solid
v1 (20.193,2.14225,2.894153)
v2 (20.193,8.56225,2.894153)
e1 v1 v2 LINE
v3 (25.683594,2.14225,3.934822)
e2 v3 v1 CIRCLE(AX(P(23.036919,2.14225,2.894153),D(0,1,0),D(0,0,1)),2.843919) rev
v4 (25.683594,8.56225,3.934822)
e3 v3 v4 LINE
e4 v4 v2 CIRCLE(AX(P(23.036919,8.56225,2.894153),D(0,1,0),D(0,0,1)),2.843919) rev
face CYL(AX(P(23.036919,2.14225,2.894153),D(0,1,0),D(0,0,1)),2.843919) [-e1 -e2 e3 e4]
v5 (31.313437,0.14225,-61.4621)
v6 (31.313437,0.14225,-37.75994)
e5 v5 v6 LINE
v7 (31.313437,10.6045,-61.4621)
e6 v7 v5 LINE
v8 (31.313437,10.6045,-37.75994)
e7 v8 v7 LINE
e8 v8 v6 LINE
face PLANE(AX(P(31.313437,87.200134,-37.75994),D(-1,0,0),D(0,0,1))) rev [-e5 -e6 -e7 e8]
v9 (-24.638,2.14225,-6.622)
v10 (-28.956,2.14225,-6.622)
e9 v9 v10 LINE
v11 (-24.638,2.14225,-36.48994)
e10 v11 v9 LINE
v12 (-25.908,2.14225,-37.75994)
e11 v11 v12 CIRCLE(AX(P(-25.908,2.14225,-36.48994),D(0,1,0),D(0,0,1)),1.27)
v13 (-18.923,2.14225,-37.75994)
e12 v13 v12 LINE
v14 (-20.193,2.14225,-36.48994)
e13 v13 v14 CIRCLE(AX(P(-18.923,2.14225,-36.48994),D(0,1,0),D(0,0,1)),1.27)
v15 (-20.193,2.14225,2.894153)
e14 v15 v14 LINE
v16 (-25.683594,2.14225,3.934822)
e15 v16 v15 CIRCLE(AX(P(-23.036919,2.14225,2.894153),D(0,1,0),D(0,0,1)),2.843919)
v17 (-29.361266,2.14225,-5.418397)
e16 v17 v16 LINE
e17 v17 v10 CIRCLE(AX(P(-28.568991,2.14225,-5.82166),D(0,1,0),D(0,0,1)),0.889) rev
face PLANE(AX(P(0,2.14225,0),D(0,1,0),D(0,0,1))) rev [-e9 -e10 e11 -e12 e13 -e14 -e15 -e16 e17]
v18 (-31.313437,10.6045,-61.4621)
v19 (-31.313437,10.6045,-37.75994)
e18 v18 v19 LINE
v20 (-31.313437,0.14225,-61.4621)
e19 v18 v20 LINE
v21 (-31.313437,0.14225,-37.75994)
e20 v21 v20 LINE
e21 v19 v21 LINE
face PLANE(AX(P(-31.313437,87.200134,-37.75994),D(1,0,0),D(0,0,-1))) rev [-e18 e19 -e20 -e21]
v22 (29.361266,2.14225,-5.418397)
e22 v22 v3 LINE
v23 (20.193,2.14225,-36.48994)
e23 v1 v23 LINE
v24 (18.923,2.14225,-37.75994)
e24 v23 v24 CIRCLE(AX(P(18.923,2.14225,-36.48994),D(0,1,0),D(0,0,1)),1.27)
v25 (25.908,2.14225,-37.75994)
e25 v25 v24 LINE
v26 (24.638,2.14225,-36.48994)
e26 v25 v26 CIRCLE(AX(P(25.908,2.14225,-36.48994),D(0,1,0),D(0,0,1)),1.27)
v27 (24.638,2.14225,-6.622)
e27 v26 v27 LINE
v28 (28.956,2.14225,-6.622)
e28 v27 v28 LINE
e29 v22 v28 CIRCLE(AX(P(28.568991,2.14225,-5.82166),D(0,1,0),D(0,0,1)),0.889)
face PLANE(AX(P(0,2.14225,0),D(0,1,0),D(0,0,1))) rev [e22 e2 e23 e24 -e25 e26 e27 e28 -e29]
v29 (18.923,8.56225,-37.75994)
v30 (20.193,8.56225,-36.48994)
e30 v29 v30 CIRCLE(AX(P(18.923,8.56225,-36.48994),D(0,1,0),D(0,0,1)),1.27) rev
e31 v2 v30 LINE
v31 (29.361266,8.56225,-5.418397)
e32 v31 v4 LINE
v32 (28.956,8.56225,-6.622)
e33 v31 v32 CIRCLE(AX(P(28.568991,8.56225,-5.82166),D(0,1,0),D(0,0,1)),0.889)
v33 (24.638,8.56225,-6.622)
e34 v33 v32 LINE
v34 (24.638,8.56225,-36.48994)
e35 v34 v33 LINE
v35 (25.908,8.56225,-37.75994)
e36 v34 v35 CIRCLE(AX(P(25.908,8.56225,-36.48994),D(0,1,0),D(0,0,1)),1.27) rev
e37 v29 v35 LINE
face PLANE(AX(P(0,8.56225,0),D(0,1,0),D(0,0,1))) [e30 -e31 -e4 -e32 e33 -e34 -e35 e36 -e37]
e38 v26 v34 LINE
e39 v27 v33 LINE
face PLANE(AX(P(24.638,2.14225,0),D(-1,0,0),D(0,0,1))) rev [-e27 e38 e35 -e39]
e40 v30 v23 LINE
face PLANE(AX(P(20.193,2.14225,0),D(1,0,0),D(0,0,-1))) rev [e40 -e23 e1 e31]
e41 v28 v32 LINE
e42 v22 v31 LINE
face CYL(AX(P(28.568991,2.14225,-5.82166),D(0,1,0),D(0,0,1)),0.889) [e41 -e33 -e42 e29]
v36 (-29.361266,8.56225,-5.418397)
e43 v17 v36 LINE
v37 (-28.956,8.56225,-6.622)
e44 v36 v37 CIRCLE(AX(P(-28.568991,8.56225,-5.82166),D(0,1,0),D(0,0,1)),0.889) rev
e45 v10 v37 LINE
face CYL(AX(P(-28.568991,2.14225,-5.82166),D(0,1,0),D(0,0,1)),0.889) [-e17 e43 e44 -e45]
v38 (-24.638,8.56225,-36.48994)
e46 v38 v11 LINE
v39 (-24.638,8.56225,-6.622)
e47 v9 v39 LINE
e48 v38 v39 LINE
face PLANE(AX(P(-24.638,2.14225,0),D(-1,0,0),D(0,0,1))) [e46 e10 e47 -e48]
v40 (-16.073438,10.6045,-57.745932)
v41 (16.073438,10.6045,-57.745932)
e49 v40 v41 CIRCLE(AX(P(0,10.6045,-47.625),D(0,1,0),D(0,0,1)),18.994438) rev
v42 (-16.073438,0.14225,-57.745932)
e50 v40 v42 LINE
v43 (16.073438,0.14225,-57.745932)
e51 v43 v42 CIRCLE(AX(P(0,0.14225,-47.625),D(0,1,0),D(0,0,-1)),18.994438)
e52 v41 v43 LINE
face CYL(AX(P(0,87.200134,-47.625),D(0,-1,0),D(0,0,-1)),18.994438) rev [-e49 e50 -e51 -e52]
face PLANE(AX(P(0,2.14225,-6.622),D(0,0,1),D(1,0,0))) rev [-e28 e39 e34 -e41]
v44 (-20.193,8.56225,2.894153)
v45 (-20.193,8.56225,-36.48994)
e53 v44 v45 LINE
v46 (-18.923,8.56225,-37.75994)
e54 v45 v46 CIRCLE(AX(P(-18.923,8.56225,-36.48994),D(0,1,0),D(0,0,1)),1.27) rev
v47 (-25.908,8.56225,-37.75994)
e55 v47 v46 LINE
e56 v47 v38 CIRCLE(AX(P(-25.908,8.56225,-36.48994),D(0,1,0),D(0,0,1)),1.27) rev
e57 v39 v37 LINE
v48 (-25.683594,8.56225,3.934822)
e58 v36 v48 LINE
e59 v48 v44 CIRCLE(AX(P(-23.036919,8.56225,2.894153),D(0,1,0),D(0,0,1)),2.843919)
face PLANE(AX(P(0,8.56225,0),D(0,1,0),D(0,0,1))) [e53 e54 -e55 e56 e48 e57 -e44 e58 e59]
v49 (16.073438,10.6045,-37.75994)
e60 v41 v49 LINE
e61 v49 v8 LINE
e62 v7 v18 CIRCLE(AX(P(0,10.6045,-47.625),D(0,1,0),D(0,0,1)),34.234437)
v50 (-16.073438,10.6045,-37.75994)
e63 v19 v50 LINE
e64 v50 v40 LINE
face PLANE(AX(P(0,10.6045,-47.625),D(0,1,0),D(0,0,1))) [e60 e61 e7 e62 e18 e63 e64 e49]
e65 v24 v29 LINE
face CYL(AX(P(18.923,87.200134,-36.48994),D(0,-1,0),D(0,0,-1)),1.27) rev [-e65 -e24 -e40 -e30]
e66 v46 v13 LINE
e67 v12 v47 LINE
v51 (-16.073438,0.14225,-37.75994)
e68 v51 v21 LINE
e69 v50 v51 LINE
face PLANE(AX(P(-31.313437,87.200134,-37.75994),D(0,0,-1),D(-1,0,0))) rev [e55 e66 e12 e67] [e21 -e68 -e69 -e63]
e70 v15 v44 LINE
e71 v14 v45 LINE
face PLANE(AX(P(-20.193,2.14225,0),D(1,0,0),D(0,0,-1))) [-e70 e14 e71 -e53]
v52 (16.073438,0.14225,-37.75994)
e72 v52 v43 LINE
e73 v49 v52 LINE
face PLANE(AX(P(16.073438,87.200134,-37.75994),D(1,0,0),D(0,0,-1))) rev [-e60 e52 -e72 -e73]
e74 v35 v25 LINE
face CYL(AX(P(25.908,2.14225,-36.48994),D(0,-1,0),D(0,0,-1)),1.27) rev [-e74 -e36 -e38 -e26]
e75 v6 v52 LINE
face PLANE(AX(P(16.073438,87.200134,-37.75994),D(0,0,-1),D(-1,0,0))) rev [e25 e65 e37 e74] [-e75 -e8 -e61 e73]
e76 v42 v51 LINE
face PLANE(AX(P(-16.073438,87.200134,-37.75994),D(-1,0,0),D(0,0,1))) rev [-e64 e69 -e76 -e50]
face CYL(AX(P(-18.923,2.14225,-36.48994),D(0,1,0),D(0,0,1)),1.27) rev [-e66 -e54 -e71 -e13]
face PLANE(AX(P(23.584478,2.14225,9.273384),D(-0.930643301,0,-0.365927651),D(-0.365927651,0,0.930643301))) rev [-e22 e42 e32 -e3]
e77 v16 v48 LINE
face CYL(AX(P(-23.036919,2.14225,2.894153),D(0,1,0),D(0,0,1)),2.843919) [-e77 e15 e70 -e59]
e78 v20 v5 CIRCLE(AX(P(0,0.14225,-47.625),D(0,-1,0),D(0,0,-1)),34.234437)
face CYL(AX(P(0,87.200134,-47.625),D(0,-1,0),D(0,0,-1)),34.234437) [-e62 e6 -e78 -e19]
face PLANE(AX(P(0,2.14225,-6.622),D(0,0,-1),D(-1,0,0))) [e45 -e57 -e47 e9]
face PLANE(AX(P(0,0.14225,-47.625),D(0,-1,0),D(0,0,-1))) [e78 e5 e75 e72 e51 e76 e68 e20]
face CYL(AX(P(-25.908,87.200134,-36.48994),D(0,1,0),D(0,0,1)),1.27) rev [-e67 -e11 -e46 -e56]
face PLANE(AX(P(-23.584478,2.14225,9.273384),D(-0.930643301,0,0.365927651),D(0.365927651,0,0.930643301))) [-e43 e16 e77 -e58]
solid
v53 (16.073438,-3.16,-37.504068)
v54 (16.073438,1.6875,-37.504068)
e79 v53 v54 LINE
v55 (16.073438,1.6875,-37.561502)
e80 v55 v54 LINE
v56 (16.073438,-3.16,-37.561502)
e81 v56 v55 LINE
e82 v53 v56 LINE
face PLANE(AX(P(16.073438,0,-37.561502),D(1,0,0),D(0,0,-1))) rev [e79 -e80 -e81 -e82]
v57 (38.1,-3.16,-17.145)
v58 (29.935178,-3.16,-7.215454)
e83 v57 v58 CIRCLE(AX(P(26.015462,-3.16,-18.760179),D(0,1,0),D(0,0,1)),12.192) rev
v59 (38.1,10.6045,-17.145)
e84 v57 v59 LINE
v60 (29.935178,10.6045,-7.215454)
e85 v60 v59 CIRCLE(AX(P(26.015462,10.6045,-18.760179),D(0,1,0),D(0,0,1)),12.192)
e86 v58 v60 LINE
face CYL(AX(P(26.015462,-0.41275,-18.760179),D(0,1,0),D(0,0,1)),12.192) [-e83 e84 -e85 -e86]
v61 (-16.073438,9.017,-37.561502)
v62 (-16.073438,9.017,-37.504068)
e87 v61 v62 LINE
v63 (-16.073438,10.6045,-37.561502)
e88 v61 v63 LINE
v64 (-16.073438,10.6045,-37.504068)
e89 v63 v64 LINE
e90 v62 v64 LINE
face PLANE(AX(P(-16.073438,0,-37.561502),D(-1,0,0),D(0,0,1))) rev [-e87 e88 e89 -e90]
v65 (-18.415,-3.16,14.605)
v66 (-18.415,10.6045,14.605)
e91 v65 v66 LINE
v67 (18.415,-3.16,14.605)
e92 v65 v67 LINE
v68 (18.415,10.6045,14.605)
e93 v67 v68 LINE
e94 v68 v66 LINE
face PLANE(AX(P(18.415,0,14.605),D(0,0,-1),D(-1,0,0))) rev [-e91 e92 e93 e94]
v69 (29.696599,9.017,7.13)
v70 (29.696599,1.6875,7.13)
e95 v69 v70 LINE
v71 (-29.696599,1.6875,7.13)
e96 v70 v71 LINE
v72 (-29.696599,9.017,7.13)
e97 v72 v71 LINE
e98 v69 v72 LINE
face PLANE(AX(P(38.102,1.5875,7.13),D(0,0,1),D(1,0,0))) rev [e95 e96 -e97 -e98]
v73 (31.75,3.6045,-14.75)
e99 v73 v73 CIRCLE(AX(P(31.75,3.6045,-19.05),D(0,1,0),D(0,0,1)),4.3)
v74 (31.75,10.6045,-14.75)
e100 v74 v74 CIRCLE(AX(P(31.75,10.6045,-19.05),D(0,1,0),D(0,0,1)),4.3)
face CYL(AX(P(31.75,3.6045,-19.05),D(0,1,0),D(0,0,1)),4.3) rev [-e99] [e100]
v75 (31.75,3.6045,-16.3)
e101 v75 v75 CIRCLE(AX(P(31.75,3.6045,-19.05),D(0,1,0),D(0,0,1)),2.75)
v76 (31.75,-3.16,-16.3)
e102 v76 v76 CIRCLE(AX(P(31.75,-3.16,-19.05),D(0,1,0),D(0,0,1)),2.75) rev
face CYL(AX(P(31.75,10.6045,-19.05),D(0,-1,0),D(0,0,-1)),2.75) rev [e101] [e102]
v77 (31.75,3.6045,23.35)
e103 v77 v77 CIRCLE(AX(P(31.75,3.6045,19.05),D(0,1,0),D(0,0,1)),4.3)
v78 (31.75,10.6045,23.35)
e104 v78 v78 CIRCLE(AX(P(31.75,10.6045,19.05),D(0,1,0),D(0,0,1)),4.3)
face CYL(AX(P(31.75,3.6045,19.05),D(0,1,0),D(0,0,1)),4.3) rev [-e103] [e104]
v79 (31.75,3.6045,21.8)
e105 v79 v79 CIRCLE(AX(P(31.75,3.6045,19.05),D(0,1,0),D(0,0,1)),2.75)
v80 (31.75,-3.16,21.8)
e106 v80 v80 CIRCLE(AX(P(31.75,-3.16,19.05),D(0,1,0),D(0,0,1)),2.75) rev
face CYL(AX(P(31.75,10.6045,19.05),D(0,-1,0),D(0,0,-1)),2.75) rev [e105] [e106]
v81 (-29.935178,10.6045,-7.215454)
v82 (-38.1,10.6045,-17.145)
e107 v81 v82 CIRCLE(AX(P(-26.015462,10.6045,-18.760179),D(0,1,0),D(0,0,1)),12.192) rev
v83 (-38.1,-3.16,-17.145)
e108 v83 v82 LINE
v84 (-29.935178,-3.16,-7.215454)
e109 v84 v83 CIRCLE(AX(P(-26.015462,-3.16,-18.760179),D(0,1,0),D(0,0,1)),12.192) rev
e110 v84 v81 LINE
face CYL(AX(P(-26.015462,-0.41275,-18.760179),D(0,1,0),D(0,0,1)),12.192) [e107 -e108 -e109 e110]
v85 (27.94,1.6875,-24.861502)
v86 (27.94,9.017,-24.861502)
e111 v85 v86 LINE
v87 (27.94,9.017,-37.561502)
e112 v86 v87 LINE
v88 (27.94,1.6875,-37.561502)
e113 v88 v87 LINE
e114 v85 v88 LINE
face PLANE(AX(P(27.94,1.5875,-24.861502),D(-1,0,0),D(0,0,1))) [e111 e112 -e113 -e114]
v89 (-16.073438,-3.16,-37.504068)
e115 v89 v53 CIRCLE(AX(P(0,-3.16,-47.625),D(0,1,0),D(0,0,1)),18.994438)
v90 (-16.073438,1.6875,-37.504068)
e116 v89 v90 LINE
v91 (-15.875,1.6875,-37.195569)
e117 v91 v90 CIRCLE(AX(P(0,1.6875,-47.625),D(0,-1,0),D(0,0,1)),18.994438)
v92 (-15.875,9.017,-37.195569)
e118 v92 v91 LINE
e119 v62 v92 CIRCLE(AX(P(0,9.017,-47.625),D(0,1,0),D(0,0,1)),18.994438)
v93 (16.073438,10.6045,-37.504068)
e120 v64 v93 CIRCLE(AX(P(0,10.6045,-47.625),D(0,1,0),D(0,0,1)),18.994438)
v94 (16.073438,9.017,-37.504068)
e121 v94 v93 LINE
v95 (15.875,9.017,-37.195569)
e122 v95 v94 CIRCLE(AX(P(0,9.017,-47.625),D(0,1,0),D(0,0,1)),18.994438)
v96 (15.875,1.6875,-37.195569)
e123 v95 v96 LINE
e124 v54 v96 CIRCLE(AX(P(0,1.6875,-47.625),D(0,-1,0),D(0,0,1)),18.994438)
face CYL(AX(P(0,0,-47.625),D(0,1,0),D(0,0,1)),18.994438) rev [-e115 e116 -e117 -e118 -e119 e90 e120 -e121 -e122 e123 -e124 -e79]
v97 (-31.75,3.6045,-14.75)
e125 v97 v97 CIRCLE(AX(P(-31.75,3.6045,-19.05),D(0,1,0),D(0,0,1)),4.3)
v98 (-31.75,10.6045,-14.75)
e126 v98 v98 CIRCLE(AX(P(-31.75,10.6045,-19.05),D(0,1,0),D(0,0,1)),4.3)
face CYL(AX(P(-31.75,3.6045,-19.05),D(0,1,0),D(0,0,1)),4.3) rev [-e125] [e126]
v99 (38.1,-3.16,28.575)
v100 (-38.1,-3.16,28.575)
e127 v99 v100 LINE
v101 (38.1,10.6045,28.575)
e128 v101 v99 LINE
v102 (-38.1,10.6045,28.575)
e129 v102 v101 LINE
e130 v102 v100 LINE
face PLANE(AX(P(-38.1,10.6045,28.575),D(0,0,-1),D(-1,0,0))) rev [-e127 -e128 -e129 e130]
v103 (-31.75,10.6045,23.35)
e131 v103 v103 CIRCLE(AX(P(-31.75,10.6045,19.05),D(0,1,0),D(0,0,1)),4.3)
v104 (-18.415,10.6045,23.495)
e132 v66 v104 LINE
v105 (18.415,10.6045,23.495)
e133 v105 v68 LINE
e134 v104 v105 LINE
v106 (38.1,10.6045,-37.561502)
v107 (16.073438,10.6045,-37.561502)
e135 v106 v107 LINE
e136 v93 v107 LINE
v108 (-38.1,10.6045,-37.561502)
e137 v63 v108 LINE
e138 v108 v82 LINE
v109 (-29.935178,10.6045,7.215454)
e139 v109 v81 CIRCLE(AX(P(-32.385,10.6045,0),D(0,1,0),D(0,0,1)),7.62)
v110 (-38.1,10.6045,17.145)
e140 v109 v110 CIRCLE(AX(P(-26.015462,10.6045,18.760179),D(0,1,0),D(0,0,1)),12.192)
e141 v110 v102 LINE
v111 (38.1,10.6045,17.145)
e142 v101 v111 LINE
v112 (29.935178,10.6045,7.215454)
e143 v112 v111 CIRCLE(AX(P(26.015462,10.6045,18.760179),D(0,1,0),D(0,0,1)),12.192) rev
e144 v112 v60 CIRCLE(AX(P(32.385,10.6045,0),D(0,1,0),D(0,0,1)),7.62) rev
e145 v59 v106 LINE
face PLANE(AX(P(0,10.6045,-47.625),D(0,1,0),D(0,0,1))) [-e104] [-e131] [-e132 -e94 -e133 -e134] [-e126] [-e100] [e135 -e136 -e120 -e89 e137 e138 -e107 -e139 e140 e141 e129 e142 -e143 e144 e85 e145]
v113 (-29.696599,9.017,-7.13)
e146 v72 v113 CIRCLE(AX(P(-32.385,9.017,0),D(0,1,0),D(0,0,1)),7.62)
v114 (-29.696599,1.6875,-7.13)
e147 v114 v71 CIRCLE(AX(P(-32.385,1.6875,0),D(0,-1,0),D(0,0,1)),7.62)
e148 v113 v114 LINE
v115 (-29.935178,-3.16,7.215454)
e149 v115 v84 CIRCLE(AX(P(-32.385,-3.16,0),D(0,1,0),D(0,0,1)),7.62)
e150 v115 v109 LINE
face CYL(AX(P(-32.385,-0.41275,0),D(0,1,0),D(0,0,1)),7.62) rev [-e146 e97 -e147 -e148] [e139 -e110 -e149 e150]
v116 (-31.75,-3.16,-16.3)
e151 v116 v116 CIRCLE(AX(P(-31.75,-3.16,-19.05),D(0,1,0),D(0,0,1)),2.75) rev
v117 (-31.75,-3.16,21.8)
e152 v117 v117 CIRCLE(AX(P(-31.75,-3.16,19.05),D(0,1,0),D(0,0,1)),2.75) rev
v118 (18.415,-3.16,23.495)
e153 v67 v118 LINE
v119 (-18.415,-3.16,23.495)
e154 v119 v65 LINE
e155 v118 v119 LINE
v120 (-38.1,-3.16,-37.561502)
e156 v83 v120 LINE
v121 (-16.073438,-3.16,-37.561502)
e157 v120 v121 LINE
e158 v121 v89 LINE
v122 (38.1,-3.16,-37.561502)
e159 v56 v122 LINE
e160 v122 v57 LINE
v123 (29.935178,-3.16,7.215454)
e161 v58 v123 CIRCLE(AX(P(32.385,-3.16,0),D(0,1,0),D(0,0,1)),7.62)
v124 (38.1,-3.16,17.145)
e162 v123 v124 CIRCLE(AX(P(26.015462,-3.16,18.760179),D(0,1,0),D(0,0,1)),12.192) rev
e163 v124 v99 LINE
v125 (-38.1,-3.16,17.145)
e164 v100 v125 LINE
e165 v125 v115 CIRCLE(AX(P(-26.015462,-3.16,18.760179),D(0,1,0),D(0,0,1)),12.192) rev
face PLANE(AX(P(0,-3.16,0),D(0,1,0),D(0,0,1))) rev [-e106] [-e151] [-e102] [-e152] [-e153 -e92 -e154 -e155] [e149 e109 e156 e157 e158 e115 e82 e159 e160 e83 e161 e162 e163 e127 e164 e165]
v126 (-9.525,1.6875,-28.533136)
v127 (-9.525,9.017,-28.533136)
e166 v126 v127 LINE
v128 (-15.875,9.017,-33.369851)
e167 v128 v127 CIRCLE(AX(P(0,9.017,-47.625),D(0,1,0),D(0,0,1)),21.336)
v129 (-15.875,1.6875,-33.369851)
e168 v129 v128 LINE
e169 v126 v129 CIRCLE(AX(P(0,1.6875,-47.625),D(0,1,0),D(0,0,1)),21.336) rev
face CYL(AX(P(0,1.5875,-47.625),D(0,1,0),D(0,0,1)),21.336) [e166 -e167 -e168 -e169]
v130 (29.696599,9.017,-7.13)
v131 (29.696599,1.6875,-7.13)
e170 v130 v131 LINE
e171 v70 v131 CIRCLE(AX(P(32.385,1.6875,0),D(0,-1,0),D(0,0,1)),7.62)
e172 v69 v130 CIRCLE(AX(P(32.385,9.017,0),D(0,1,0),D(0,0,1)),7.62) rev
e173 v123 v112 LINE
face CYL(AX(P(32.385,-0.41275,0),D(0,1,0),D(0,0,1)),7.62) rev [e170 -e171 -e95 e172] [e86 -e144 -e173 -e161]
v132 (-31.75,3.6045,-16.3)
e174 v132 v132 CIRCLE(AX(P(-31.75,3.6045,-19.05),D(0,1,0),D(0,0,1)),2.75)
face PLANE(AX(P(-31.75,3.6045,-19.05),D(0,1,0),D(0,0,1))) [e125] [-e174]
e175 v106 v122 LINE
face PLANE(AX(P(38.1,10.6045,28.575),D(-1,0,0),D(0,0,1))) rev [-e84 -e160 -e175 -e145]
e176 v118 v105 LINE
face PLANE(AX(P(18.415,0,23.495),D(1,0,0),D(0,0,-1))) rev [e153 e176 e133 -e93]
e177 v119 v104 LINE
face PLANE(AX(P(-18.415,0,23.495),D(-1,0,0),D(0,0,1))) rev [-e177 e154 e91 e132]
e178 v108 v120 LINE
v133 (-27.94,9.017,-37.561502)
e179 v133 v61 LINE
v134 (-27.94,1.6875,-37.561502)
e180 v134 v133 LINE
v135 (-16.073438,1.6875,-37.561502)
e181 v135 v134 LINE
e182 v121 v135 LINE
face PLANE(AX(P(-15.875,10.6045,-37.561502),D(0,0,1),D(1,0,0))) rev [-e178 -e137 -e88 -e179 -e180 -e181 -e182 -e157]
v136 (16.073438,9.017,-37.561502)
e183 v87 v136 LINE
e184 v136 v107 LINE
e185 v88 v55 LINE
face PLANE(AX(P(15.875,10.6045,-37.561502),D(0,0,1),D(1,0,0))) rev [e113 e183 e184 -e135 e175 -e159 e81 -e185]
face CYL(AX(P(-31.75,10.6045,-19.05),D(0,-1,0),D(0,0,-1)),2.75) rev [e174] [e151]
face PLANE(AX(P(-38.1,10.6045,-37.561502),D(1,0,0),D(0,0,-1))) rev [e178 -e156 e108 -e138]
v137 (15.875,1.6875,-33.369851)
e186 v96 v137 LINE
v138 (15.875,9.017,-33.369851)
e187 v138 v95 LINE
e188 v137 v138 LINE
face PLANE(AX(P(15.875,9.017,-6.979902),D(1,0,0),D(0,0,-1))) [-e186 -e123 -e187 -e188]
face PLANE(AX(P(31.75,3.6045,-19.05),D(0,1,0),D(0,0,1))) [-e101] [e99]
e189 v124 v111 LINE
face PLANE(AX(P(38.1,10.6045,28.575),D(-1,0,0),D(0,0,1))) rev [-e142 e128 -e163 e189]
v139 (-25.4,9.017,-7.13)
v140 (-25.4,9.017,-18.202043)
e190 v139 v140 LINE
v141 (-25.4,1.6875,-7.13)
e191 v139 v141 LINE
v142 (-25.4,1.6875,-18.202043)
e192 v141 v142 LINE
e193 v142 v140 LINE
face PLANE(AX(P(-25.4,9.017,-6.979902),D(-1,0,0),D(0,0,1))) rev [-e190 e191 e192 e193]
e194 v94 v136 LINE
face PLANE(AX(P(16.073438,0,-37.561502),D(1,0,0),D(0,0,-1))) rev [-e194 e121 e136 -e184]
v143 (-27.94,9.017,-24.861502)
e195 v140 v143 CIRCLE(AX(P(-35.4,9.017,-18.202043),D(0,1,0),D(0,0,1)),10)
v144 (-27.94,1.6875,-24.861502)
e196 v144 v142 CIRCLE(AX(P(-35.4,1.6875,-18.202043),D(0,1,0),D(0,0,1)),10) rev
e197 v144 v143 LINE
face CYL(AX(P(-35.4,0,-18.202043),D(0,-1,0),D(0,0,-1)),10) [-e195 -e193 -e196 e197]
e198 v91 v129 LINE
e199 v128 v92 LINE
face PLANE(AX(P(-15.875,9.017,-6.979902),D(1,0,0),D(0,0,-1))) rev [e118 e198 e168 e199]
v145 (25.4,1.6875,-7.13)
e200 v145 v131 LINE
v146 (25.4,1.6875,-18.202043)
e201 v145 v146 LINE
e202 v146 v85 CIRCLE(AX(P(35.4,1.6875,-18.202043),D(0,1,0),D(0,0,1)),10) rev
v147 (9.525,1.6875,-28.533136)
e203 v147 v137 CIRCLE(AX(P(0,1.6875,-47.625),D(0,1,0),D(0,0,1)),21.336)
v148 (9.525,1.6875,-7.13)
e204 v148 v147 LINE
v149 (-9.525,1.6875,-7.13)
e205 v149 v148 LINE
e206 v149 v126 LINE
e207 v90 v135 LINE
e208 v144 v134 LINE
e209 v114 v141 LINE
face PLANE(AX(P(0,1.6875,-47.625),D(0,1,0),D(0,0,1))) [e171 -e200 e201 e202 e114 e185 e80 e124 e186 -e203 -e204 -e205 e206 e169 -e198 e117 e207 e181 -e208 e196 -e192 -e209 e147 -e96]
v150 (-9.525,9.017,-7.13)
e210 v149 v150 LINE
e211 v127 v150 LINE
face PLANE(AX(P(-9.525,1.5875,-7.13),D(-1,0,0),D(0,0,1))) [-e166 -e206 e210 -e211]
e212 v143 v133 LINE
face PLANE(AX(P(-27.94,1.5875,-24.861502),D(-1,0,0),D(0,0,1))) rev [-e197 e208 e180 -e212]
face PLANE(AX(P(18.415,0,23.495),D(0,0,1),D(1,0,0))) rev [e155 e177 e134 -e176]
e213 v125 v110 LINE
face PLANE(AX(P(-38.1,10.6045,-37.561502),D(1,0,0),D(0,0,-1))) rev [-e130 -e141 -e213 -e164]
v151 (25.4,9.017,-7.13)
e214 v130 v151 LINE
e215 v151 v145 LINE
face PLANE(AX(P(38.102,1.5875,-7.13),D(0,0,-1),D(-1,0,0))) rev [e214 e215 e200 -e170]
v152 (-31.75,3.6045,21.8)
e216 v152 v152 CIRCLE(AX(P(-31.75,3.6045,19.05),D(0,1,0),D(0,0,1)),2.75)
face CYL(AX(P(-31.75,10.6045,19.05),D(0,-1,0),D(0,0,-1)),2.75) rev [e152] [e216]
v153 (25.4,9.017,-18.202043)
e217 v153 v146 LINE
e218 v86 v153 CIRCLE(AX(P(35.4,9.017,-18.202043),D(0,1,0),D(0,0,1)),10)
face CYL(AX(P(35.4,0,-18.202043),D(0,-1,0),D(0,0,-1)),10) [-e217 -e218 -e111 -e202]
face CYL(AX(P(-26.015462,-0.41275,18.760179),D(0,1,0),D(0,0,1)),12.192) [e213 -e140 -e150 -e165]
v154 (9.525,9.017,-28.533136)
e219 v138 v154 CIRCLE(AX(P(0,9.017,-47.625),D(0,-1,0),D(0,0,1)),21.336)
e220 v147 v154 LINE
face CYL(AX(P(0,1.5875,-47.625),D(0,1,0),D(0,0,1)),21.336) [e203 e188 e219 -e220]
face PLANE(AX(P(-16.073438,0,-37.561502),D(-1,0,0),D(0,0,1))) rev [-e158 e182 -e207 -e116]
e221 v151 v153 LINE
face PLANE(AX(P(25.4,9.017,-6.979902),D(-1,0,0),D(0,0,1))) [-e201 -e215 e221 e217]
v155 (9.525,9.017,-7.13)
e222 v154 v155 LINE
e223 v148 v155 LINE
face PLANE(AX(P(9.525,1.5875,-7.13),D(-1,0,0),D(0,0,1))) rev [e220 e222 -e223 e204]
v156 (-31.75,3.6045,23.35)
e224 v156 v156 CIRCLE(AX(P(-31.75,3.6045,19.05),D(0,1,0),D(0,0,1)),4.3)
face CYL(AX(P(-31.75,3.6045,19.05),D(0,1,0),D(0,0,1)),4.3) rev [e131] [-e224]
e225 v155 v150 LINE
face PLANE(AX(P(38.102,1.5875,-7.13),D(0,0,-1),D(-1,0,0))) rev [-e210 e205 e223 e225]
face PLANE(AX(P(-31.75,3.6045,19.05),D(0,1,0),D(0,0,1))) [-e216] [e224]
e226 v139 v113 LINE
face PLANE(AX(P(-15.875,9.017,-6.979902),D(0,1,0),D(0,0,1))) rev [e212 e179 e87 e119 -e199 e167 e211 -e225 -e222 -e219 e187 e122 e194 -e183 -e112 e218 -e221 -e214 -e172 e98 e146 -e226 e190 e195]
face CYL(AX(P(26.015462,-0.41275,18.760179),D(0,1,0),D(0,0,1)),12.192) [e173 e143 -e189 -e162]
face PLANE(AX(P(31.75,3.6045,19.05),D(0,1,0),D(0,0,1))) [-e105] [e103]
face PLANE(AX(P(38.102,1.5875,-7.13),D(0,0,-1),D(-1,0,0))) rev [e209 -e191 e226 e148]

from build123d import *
from build123d.topology import SkipClean

# Parameters (mm, degrees)
SKETCH1_R                = 2.75
BOSS_EXTRUDE1_DEPTH      = 10.6045
SKETCH2_R                = 4.3
CUT_EXTRUDE1_DEPTH       = 7
SKETCH3_W                = 9.525
SKETCH3_H                = 7.4295
CUT_EXTRUDE2_DEPTH       = 30.5816
CUT_EXTRUDE5_REACH       = 87.614
SKETCH4_W                = 14.26
SKETCH4_H                = 7.4295
CUT_EXTRUDE6_DEPTH       = 3.71475
CUT_EXTRUDE7_DEPTH       = 5.715
MIRROR5_COPY_1_DEPTH     = 5.715
BOSS_EXTRUDE3_DEPTH      = 3.26
BOSS_EXTRUDE3_DEPTH_BACK = 3.16
CUT_EXTRUDE8_DEPTH       = 91.912226505
BOSS_EXTRUDE4_START      = 2.04225
BOSS_EXTRUDE4_DEPTH      = 2.04225
SKETCH13_W               = 36.83
SKETCH13_H               = 8.89
CUT_EXTRUDE10_DEPTH      = 91.912226505
SKETCH16_W               = 2.54
SKETCH16_H               = 7.4295
CUT_EXTRUDE11_DEPTH      = 12.7
FILLET1_R                = 10
FILLET3_R                = 1.27
BOSS_EXTRUDE5_DEPTH      = 0.1
BOSS_EXTRUDE5_DEPTH_BACK = 4.7475
SKETCH20_R               = 2.75
SKETCH20_W               = 36.83
SKETCH20_H               = 8.89
BOSS_EXTRUDE6_START      = 2
BOSS_EXTRUDE6_DEPTH      = 2


with BuildPart() as part:
    # Sketch1 → Boss-Extrude1 (new body)
    with BuildSketch(Plane(origin=(0, 0, 0), x_dir=(1, 0, 0), z_dir=(0, 1, 0))):
        with BuildLine():
            Line((-38.1, -28.575), (38.1, -28.575))
            Line((38.1, -28.575), (38.1, 37.561502049))
            Line((38.1, 37.561502049), (15.875, 37.561502049))
            ThreePointArc((15.875, 37.561502049), (0, 28.829), (-15.875, 37.561502049))
            Line((-15.875, 37.561502049), (-38.1, 37.561502049))
            Line((-38.1, 37.561502049), (-38.1, -28.575))
        make_face()
        with Locations(Location((-31.75, 19.05, 0), (0, 0, 270))):
            Circle(SKETCH1_R, mode=Mode.SUBTRACT)
        with Locations(Location((31.75, 19.05, 0), (0, 0, 270))):
            Circle(SKETCH1_R, mode=Mode.SUBTRACT)
        with Locations(Location((31.75, -19.05, 0), (0, 0, 270))):
            Circle(SKETCH1_R, mode=Mode.SUBTRACT)
        with Locations(Location((-31.75, -19.05, 0), (0, 0, 270))):
            Circle(SKETCH1_R, mode=Mode.SUBTRACT)
    extrude(amount=BOSS_EXTRUDE1_DEPTH)

    # Sketch2 → Cut-Extrude1 (cut)
    with BuildSketch(Plane(origin=(0, 10.6045, 0), x_dir=(1, 0, 0), z_dir=(0, 1, 0))):
        with Locations(Location((-31.75, 19.05, 0), (0, 0, 270))):
            Circle(SKETCH2_R)
        with Locations(Location((31.75, 19.05, 0), (0, 0, 270))):
            Circle(SKETCH2_R)
        with Locations(Location((31.75, -19.05, 0), (0, 0, 270))):
            Circle(SKETCH2_R)
        with Locations(Location((-31.75, -19.05, 0), (0, 0, 270))):
            Circle(SKETCH2_R)
    extrude(amount=-CUT_EXTRUDE1_DEPTH, mode=Mode.SUBTRACT)

    # Sketch3 → Cut-Extrude2 (cut)
    with BuildSketch(Plane(origin=(0, 0, -37.561502049), x_dir=(-1, 0, 0), z_dir=(0, 0, -1))):
        with Locations((20.6375, 5.30225)):
            Rectangle(SKETCH3_W, SKETCH3_H)
    cut_extrude2 = extrude(amount=-CUT_EXTRUDE2_DEPTH, mode=Mode.SUBTRACT)

    # Mirror1: Cut-Extrude2 across plane
    add(cut_extrude2.mirror(Plane(origin=(0, 0, 0), x_dir=(0, 0, 1), z_dir=(1, 0, 0))), mode=Mode.SUBTRACT)

    # Sketch4 → Cut-Extrude5 (cut, up to next)
    with BuildSketch(Plane.ZY.offset(38.1), mode=Mode.PRIVATE) as cut_extrude5_sk1:
        with Locations((0, 5.30225)):
            Rectangle(SKETCH4_W, SKETCH4_H)
    cut_extrude5_tool1 = extrude(cut_extrude5_sk1.sketch, amount=-CUT_EXTRUDE5_REACH, mode=Mode.PRIVATE) & part.part
    add(cut_extrude5_tool1.solids().sort_by_distance((-38.1, 5.30225, 0))[0], mode=Mode.SUBTRACT)

    # Sketch6 → Cut-Extrude6 (cut, symmetric)
    with BuildSketch(Plane(origin=(0, 5.30225, 0), x_dir=(1, 0, 0), z_dir=(0, 1, 0))):
        with BuildLine():
            Line((15.875, 33.369851071), (15.875, 7.13))
            Line((15.875, 7.13), (9.525, 7.13))
            Line((9.525, 7.13), (9.525, 28.533136))
            ThreePointArc((9.525, 28.533136), (12.928203787, 30.651890596), (15.875, 33.369851071))
        make_face()
    cut_extrude6 = extrude(amount=CUT_EXTRUDE6_DEPTH, both=True, mode=Mode.SUBTRACT)

    # Mirror3: Cut-Extrude6 across plane
    add(cut_extrude6.mirror(Plane(origin=(0, 0, 0), x_dir=(0, 0, 1), z_dir=(1, 0, 0))), mode=Mode.SUBTRACT)

    # Sketch7 → Cut-Extrude7 (cut, symmetric)
    with BuildSketch(Plane(origin=(0, 5.30225, 0), x_dir=(1, 0, 0), z_dir=(0, 1, 0))):
        with BuildLine():
            Line((-38.1, 17.145), (-38.1, 0))
            Line((-38.1, 0), (-24.765, 0))
            ThreePointArc((-24.765, 0), (-26.190968756, 4.438285361), (-29.935177676, 7.215453595))
            ThreePointArc((-29.935177676, 7.215453595), (-35.432627538, 11.016675202), (-38.1, 17.145))
        make_face()
    cut_extrude7 = extrude(amount=CUT_EXTRUDE7_DEPTH, both=True, mode=Mode.SUBTRACT)

    # Mirror4: Cut-Extrude7 across plane
    add(cut_extrude7.mirror(Plane(origin=(0, 0, 0), x_dir=(0, 0, 1), z_dir=(1, 0, 0))), mode=Mode.SUBTRACT)

    # Mirror5: Cut-Extrude7 across plane
    add(cut_extrude7.mirror(Plane.XY), mode=Mode.SUBTRACT)

    # Mirror5 copy 1 sketch → Mirror5 copy 1 (cut, symmetric)
    with BuildSketch(Plane(origin=(0, 5.30225, 0), x_dir=(-1, 0, 0), z_dir=(0, 1, 0))):
        with BuildLine():
            Line((-38.1, 17.145), (-38.1, 0))
            Line((-38.1, 0), (-24.765, 0))
            ThreePointArc((-24.765, 0), (-26.190968756, 4.438285361), (-29.935177676, 7.215453595))
            ThreePointArc((-29.935177676, 7.215453595), (-35.432627538, 11.016675202), (-38.1, 17.145))
        make_face()
    extrude(amount=MIRROR5_COPY_1_DEPTH, both=True, mode=Mode.SUBTRACT)

    # Sketch10 → Cut-Extrude8 (cut, through all)
    with BuildSketch(Plane(origin=(0, 10.6045, 0), x_dir=(1, 0, 0), z_dir=(0, 1, 0))):
        with BuildLine():
            Line((-16.0734375, 37.561502049), (-16.0734375, 37.504068083))
            ThreePointArc((-16.0734375, 37.504068083), (0, 28.6305625), (16.0734375, 37.504068083))
            Line((16.0734375, 37.504068083), (16.0734375, 37.561502049))
            Line((16.0734375, 37.561502049), (-16.0734375, 37.561502049))
        make_face()
    extrude(amount=-CUT_EXTRUDE8_DEPTH, mode=Mode.SUBTRACT)

    # Sketch13 → Cut-Extrude10 (cut, through all)
    with BuildSketch(Plane(origin=(0, 10.6045, 0), x_dir=(1, 0, 0), z_dir=(0, 1, 0))):
        with Locations((0, -19.05)):
            Rectangle(SKETCH13_W, SKETCH13_H)
    extrude(amount=-CUT_EXTRUDE10_DEPTH, mode=Mode.SUBTRACT)

    # Sketch16 → Cut-Extrude11 (cut)
    with BuildSketch(Plane(origin=(0, 0, -37.561502049), x_dir=(-1, 0, 0), z_dir=(0, 0, -1))):
        with Locations((26.67, 5.30225)):
            Rectangle(SKETCH16_W, SKETCH16_H)
    cut_extrude11 = extrude(amount=-CUT_EXTRUDE11_DEPTH, mode=Mode.SUBTRACT)

    # Mirror6: Cut-Extrude11 across plane
    add(cut_extrude11.mirror(Plane(origin=(0, 0, 0), x_dir=(0, 0, 1), z_dir=(1, 0, 0))), mode=Mode.SUBTRACT)

    # Fillet1
    # the kernel refuses this fillet: 10 mm, written as the material it takes off along each edge
    with BuildSketch(Plane(origin=(25.4, 9.017, -24.861502049), x_dir=(0, 0, 1), z_dir=(0, -1, 0))) as fillet1_piece_1:
        with BuildLine():
            CenterArc((6.659459438, -10), FILLET1_R, 90, 41.754936598)
            Line((0, -2.54), (0, 0))
            Line((0, 0), (6.659459438, 0))
        make_face()
    extrude(amount=7.4295, mode=Mode.SUBTRACT)
    with BuildSketch(Plane(origin=(-25.4, 9.017, -24.861502049), x_dir=(-1, 0, 0), z_dir=(0, -1, 0))) as fillet1_piece_2:
        with BuildLine():
            CenterArc((10, -6.659459438), FILLET1_R, 138.245063402, 41.754936598)
            Line((0, -6.659459438), (0, 0))
            Line((0, 0), (2.54, 0))
        make_face()
    extrude(amount=7.4295, mode=Mode.SUBTRACT)

    # Sketch20 → Boss-Extrude5 (add, two sides: drawn at the far end of the back side and taken through both)
    with SkipClean():  # the faces are left unmerged after this step: merging them gives an invalid solid
        with BuildSketch(Plane(origin=(0, 1.5875, 0), x_dir=(1, 0, 0), z_dir=(0, 1, 0)).offset(-BOSS_EXTRUDE5_DEPTH_BACK)):
            with BuildLine():
                Line((16.0734375, 37.561502049), (16.0734375, 37.504068083))
                ThreePointArc((16.0734375, 37.504068083), (0, 28.6305625), (-16.0734375, 37.504068083))
                Line((-16.0734375, 37.504068083), (-16.0734375, 37.561502049))
                Line((-16.0734375, 37.561502049), (-38.1, 37.561502049))
                Line((-38.1, 37.561502049), (-38.1, 17.145))
                ThreePointArc((-38.1, 17.145), (-35.432627538, 11.016675202), (-29.935177676, 7.215453595))
                ThreePointArc((-29.935177676, 7.215453595), (-24.765, 0), (-29.935177676, -7.215453595))
                ThreePointArc((-29.935177676, -7.215453595), (-35.432627538, -11.016675202), (-38.1, -17.145))
                Line((-38.1, -17.145), (-38.1, -28.575))
                Line((-38.1, -28.575), (38.1, -28.575))
                Line((38.1, -28.575), (38.1, -17.145))
                ThreePointArc((38.1, -17.145), (35.432627538, -11.016675202), (29.935177676, -7.215453595))
                ThreePointArc((29.935177676, -7.215453595), (24.765, 0), (29.935177676, 7.215453595))
                ThreePointArc((29.935177676, 7.215453595), (35.432627538, 11.016675202), (38.1, 17.145))
                Line((38.1, 17.145), (38.1, 37.561502049))
                Line((38.1, 37.561502049), (16.0734375, 37.561502049))
            make_face()
            with Locations(Location((-31.75, 19.05, 0), (0, 0, 270))):
                Circle(SKETCH20_R, mode=Mode.SUBTRACT)
            with Locations(Location((31.75, 19.05, 0), (0, 0, 270))):
                Circle(SKETCH20_R, mode=Mode.SUBTRACT)
            with Locations(Location((-31.75, -19.05, 0), (0, 0, 270))):
                Circle(SKETCH20_R, mode=Mode.SUBTRACT)
            with Locations(Location((31.75, -19.05, 0), (0, 0, 270))):
                Circle(SKETCH20_R, mode=Mode.SUBTRACT)
            with Locations((0, -19.05)):
                Rectangle(SKETCH20_W, SKETCH20_H, mode=Mode.SUBTRACT)
        extrude(amount=BOSS_EXTRUDE5_DEPTH + BOSS_EXTRUDE5_DEPTH_BACK)


with BuildPart() as body_2:
    # Sketch8 → Boss-Extrude3 (new, two sides: drawn at the far end of the back side and taken through both)
    with BuildSketch(Plane(origin=(0, 5.30225, 0), x_dir=(1, 0, 0), z_dir=(0, 1, 0)).offset(-BOSS_EXTRUDE3_DEPTH_BACK)):
        with BuildLine():
            Line((16.0734375, 37.759939549), (16.0734375, 57.745931917))
            ThreePointArc((16.0734375, 57.745931917), (0, 66.6194375), (-16.0734375, 57.745931917))
            Line((-16.0734375, 57.745931917), (-16.0734375, 37.759939549))
            Line((-16.0734375, 37.759939549), (-20.193, 37.759939549))
            Line((-20.193, 37.759939549), (-20.193, -2.894153135))
            ThreePointArc((-20.193, -2.894153135), (-22.507321082, -5.688326081), (-25.683593638, -3.934821824))
            Line((-25.683593638, -3.934821824), (-29.361266441, 5.418397444))
            ThreePointArc((-29.361266441, 5.418397444), (-29.411512587, 6.105346033), (-28.956, 6.622))
            Line((-28.956, 6.622), (-24.638, 6.622))
            Line((-24.638, 6.622), (-24.638, 37.759939549))
            Line((-24.638, 37.759939549), (-31.3134375, 37.759939549))
            Line((-31.3134375, 37.759939549), (-31.3134375, 61.462100234))
            ThreePointArc((-31.3134375, 61.462100234), (0, 81.8594375), (31.3134375, 61.462100234))
            Line((31.3134375, 61.462100234), (31.3134375, 37.759939549))
            Line((31.3134375, 37.759939549), (24.638, 37.759939549))
            Line((24.638, 37.759939549), (24.638, 6.622))
            Line((24.638, 6.622), (28.956, 6.622))
            ThreePointArc((28.956, 6.622), (29.411512587, 6.105346033), (29.361266441, 5.418397444))
            Line((29.361266441, 5.418397444), (25.683593638, -3.934821824))
            ThreePointArc((25.683593638, -3.934821824), (22.507321082, -5.688326081), (20.193, -2.894153135))
            Line((20.193, -2.894153135), (20.193, 37.759939549))
            Line((20.193, 37.759939549), (16.0734375, 37.759939549))
        make_face()
    extrude(amount=BOSS_EXTRUDE3_DEPTH + BOSS_EXTRUDE3_DEPTH_BACK)


with BuildPart() as body_3:
    # Sketch11 → Boss-Extrude4 (new body)
    with BuildSketch(Plane(origin=(0, 8.56225, 0), x_dir=(1, 0, 0), z_dir=(0, 1, 0)).offset(BOSS_EXTRUDE4_START)):
        with BuildLine():
            Line((31.3134375, 37.759939549), (31.3134375, 61.462100234))
            ThreePointArc((31.3134375, 61.462100234), (0, 81.8594375), (-31.3134375, 61.462100234))
            Line((-31.3134375, 61.462100234), (-31.3134375, 37.759939549))
            Line((-31.3134375, 37.759939549), (-16.0734375, 37.759939549))
            Line((-16.0734375, 37.759939549), (-16.0734375, 57.745931917))
            ThreePointArc((-16.0734375, 57.745931917), (0, 66.6194375), (16.0734375, 57.745931917))
            Line((16.0734375, 57.745931917), (16.0734375, 37.759939549))
            Line((16.0734375, 37.759939549), (31.3134375, 37.759939549))
        make_face()
    extrude(amount=-BOSS_EXTRUDE4_DEPTH)

    # Combine1: union body 2
    add(body_2.part)

    # Fillet3
    fillet3_edges = [body_3.edges().sort_by_distance(p)[0] for p in [
        (-24.638, 5.35225, -37.759939549),
        (24.638, 5.35225, -37.759939549),
        (20.193, 5.35225, -37.759939549),
        (-20.193, 5.35225, -37.759939549),
    ]]
    fillet(fillet3_edges, radius=FILLET3_R)

    # Sketch21 → Boss-Extrude6 (add)
    with BuildSketch(Plane.XZ.offset(-2.14225).offset(BOSS_EXTRUDE6_START)):
        with BuildLine():
            Line((-31.3134375, -37.759939549), (-16.0734375, -37.759939549))
            Line((-16.0734375, -37.759939549), (-16.0734375, -57.745931917))
            ThreePointArc((-16.0734375, -57.745931917), (0, -66.6194375), (16.0734375, -57.745931917))
            Line((16.0734375, -57.745931917), (16.0734375, -37.759939549))
            Line((16.0734375, -37.759939549), (31.3134375, -37.759939549))
            Line((31.3134375, -37.759939549), (31.3134375, -61.462100234))
            ThreePointArc((31.3134375, -61.462100234), (0, -81.8594375), (-31.3134375, -61.462100234))
            Line((-31.3134375, -61.462100234), (-31.3134375, -37.759939549))
        make_face()
    extrude(amount=-BOSS_EXTRUDE6_DEPTH)


solid = Compound([part.part, body_3.part])
